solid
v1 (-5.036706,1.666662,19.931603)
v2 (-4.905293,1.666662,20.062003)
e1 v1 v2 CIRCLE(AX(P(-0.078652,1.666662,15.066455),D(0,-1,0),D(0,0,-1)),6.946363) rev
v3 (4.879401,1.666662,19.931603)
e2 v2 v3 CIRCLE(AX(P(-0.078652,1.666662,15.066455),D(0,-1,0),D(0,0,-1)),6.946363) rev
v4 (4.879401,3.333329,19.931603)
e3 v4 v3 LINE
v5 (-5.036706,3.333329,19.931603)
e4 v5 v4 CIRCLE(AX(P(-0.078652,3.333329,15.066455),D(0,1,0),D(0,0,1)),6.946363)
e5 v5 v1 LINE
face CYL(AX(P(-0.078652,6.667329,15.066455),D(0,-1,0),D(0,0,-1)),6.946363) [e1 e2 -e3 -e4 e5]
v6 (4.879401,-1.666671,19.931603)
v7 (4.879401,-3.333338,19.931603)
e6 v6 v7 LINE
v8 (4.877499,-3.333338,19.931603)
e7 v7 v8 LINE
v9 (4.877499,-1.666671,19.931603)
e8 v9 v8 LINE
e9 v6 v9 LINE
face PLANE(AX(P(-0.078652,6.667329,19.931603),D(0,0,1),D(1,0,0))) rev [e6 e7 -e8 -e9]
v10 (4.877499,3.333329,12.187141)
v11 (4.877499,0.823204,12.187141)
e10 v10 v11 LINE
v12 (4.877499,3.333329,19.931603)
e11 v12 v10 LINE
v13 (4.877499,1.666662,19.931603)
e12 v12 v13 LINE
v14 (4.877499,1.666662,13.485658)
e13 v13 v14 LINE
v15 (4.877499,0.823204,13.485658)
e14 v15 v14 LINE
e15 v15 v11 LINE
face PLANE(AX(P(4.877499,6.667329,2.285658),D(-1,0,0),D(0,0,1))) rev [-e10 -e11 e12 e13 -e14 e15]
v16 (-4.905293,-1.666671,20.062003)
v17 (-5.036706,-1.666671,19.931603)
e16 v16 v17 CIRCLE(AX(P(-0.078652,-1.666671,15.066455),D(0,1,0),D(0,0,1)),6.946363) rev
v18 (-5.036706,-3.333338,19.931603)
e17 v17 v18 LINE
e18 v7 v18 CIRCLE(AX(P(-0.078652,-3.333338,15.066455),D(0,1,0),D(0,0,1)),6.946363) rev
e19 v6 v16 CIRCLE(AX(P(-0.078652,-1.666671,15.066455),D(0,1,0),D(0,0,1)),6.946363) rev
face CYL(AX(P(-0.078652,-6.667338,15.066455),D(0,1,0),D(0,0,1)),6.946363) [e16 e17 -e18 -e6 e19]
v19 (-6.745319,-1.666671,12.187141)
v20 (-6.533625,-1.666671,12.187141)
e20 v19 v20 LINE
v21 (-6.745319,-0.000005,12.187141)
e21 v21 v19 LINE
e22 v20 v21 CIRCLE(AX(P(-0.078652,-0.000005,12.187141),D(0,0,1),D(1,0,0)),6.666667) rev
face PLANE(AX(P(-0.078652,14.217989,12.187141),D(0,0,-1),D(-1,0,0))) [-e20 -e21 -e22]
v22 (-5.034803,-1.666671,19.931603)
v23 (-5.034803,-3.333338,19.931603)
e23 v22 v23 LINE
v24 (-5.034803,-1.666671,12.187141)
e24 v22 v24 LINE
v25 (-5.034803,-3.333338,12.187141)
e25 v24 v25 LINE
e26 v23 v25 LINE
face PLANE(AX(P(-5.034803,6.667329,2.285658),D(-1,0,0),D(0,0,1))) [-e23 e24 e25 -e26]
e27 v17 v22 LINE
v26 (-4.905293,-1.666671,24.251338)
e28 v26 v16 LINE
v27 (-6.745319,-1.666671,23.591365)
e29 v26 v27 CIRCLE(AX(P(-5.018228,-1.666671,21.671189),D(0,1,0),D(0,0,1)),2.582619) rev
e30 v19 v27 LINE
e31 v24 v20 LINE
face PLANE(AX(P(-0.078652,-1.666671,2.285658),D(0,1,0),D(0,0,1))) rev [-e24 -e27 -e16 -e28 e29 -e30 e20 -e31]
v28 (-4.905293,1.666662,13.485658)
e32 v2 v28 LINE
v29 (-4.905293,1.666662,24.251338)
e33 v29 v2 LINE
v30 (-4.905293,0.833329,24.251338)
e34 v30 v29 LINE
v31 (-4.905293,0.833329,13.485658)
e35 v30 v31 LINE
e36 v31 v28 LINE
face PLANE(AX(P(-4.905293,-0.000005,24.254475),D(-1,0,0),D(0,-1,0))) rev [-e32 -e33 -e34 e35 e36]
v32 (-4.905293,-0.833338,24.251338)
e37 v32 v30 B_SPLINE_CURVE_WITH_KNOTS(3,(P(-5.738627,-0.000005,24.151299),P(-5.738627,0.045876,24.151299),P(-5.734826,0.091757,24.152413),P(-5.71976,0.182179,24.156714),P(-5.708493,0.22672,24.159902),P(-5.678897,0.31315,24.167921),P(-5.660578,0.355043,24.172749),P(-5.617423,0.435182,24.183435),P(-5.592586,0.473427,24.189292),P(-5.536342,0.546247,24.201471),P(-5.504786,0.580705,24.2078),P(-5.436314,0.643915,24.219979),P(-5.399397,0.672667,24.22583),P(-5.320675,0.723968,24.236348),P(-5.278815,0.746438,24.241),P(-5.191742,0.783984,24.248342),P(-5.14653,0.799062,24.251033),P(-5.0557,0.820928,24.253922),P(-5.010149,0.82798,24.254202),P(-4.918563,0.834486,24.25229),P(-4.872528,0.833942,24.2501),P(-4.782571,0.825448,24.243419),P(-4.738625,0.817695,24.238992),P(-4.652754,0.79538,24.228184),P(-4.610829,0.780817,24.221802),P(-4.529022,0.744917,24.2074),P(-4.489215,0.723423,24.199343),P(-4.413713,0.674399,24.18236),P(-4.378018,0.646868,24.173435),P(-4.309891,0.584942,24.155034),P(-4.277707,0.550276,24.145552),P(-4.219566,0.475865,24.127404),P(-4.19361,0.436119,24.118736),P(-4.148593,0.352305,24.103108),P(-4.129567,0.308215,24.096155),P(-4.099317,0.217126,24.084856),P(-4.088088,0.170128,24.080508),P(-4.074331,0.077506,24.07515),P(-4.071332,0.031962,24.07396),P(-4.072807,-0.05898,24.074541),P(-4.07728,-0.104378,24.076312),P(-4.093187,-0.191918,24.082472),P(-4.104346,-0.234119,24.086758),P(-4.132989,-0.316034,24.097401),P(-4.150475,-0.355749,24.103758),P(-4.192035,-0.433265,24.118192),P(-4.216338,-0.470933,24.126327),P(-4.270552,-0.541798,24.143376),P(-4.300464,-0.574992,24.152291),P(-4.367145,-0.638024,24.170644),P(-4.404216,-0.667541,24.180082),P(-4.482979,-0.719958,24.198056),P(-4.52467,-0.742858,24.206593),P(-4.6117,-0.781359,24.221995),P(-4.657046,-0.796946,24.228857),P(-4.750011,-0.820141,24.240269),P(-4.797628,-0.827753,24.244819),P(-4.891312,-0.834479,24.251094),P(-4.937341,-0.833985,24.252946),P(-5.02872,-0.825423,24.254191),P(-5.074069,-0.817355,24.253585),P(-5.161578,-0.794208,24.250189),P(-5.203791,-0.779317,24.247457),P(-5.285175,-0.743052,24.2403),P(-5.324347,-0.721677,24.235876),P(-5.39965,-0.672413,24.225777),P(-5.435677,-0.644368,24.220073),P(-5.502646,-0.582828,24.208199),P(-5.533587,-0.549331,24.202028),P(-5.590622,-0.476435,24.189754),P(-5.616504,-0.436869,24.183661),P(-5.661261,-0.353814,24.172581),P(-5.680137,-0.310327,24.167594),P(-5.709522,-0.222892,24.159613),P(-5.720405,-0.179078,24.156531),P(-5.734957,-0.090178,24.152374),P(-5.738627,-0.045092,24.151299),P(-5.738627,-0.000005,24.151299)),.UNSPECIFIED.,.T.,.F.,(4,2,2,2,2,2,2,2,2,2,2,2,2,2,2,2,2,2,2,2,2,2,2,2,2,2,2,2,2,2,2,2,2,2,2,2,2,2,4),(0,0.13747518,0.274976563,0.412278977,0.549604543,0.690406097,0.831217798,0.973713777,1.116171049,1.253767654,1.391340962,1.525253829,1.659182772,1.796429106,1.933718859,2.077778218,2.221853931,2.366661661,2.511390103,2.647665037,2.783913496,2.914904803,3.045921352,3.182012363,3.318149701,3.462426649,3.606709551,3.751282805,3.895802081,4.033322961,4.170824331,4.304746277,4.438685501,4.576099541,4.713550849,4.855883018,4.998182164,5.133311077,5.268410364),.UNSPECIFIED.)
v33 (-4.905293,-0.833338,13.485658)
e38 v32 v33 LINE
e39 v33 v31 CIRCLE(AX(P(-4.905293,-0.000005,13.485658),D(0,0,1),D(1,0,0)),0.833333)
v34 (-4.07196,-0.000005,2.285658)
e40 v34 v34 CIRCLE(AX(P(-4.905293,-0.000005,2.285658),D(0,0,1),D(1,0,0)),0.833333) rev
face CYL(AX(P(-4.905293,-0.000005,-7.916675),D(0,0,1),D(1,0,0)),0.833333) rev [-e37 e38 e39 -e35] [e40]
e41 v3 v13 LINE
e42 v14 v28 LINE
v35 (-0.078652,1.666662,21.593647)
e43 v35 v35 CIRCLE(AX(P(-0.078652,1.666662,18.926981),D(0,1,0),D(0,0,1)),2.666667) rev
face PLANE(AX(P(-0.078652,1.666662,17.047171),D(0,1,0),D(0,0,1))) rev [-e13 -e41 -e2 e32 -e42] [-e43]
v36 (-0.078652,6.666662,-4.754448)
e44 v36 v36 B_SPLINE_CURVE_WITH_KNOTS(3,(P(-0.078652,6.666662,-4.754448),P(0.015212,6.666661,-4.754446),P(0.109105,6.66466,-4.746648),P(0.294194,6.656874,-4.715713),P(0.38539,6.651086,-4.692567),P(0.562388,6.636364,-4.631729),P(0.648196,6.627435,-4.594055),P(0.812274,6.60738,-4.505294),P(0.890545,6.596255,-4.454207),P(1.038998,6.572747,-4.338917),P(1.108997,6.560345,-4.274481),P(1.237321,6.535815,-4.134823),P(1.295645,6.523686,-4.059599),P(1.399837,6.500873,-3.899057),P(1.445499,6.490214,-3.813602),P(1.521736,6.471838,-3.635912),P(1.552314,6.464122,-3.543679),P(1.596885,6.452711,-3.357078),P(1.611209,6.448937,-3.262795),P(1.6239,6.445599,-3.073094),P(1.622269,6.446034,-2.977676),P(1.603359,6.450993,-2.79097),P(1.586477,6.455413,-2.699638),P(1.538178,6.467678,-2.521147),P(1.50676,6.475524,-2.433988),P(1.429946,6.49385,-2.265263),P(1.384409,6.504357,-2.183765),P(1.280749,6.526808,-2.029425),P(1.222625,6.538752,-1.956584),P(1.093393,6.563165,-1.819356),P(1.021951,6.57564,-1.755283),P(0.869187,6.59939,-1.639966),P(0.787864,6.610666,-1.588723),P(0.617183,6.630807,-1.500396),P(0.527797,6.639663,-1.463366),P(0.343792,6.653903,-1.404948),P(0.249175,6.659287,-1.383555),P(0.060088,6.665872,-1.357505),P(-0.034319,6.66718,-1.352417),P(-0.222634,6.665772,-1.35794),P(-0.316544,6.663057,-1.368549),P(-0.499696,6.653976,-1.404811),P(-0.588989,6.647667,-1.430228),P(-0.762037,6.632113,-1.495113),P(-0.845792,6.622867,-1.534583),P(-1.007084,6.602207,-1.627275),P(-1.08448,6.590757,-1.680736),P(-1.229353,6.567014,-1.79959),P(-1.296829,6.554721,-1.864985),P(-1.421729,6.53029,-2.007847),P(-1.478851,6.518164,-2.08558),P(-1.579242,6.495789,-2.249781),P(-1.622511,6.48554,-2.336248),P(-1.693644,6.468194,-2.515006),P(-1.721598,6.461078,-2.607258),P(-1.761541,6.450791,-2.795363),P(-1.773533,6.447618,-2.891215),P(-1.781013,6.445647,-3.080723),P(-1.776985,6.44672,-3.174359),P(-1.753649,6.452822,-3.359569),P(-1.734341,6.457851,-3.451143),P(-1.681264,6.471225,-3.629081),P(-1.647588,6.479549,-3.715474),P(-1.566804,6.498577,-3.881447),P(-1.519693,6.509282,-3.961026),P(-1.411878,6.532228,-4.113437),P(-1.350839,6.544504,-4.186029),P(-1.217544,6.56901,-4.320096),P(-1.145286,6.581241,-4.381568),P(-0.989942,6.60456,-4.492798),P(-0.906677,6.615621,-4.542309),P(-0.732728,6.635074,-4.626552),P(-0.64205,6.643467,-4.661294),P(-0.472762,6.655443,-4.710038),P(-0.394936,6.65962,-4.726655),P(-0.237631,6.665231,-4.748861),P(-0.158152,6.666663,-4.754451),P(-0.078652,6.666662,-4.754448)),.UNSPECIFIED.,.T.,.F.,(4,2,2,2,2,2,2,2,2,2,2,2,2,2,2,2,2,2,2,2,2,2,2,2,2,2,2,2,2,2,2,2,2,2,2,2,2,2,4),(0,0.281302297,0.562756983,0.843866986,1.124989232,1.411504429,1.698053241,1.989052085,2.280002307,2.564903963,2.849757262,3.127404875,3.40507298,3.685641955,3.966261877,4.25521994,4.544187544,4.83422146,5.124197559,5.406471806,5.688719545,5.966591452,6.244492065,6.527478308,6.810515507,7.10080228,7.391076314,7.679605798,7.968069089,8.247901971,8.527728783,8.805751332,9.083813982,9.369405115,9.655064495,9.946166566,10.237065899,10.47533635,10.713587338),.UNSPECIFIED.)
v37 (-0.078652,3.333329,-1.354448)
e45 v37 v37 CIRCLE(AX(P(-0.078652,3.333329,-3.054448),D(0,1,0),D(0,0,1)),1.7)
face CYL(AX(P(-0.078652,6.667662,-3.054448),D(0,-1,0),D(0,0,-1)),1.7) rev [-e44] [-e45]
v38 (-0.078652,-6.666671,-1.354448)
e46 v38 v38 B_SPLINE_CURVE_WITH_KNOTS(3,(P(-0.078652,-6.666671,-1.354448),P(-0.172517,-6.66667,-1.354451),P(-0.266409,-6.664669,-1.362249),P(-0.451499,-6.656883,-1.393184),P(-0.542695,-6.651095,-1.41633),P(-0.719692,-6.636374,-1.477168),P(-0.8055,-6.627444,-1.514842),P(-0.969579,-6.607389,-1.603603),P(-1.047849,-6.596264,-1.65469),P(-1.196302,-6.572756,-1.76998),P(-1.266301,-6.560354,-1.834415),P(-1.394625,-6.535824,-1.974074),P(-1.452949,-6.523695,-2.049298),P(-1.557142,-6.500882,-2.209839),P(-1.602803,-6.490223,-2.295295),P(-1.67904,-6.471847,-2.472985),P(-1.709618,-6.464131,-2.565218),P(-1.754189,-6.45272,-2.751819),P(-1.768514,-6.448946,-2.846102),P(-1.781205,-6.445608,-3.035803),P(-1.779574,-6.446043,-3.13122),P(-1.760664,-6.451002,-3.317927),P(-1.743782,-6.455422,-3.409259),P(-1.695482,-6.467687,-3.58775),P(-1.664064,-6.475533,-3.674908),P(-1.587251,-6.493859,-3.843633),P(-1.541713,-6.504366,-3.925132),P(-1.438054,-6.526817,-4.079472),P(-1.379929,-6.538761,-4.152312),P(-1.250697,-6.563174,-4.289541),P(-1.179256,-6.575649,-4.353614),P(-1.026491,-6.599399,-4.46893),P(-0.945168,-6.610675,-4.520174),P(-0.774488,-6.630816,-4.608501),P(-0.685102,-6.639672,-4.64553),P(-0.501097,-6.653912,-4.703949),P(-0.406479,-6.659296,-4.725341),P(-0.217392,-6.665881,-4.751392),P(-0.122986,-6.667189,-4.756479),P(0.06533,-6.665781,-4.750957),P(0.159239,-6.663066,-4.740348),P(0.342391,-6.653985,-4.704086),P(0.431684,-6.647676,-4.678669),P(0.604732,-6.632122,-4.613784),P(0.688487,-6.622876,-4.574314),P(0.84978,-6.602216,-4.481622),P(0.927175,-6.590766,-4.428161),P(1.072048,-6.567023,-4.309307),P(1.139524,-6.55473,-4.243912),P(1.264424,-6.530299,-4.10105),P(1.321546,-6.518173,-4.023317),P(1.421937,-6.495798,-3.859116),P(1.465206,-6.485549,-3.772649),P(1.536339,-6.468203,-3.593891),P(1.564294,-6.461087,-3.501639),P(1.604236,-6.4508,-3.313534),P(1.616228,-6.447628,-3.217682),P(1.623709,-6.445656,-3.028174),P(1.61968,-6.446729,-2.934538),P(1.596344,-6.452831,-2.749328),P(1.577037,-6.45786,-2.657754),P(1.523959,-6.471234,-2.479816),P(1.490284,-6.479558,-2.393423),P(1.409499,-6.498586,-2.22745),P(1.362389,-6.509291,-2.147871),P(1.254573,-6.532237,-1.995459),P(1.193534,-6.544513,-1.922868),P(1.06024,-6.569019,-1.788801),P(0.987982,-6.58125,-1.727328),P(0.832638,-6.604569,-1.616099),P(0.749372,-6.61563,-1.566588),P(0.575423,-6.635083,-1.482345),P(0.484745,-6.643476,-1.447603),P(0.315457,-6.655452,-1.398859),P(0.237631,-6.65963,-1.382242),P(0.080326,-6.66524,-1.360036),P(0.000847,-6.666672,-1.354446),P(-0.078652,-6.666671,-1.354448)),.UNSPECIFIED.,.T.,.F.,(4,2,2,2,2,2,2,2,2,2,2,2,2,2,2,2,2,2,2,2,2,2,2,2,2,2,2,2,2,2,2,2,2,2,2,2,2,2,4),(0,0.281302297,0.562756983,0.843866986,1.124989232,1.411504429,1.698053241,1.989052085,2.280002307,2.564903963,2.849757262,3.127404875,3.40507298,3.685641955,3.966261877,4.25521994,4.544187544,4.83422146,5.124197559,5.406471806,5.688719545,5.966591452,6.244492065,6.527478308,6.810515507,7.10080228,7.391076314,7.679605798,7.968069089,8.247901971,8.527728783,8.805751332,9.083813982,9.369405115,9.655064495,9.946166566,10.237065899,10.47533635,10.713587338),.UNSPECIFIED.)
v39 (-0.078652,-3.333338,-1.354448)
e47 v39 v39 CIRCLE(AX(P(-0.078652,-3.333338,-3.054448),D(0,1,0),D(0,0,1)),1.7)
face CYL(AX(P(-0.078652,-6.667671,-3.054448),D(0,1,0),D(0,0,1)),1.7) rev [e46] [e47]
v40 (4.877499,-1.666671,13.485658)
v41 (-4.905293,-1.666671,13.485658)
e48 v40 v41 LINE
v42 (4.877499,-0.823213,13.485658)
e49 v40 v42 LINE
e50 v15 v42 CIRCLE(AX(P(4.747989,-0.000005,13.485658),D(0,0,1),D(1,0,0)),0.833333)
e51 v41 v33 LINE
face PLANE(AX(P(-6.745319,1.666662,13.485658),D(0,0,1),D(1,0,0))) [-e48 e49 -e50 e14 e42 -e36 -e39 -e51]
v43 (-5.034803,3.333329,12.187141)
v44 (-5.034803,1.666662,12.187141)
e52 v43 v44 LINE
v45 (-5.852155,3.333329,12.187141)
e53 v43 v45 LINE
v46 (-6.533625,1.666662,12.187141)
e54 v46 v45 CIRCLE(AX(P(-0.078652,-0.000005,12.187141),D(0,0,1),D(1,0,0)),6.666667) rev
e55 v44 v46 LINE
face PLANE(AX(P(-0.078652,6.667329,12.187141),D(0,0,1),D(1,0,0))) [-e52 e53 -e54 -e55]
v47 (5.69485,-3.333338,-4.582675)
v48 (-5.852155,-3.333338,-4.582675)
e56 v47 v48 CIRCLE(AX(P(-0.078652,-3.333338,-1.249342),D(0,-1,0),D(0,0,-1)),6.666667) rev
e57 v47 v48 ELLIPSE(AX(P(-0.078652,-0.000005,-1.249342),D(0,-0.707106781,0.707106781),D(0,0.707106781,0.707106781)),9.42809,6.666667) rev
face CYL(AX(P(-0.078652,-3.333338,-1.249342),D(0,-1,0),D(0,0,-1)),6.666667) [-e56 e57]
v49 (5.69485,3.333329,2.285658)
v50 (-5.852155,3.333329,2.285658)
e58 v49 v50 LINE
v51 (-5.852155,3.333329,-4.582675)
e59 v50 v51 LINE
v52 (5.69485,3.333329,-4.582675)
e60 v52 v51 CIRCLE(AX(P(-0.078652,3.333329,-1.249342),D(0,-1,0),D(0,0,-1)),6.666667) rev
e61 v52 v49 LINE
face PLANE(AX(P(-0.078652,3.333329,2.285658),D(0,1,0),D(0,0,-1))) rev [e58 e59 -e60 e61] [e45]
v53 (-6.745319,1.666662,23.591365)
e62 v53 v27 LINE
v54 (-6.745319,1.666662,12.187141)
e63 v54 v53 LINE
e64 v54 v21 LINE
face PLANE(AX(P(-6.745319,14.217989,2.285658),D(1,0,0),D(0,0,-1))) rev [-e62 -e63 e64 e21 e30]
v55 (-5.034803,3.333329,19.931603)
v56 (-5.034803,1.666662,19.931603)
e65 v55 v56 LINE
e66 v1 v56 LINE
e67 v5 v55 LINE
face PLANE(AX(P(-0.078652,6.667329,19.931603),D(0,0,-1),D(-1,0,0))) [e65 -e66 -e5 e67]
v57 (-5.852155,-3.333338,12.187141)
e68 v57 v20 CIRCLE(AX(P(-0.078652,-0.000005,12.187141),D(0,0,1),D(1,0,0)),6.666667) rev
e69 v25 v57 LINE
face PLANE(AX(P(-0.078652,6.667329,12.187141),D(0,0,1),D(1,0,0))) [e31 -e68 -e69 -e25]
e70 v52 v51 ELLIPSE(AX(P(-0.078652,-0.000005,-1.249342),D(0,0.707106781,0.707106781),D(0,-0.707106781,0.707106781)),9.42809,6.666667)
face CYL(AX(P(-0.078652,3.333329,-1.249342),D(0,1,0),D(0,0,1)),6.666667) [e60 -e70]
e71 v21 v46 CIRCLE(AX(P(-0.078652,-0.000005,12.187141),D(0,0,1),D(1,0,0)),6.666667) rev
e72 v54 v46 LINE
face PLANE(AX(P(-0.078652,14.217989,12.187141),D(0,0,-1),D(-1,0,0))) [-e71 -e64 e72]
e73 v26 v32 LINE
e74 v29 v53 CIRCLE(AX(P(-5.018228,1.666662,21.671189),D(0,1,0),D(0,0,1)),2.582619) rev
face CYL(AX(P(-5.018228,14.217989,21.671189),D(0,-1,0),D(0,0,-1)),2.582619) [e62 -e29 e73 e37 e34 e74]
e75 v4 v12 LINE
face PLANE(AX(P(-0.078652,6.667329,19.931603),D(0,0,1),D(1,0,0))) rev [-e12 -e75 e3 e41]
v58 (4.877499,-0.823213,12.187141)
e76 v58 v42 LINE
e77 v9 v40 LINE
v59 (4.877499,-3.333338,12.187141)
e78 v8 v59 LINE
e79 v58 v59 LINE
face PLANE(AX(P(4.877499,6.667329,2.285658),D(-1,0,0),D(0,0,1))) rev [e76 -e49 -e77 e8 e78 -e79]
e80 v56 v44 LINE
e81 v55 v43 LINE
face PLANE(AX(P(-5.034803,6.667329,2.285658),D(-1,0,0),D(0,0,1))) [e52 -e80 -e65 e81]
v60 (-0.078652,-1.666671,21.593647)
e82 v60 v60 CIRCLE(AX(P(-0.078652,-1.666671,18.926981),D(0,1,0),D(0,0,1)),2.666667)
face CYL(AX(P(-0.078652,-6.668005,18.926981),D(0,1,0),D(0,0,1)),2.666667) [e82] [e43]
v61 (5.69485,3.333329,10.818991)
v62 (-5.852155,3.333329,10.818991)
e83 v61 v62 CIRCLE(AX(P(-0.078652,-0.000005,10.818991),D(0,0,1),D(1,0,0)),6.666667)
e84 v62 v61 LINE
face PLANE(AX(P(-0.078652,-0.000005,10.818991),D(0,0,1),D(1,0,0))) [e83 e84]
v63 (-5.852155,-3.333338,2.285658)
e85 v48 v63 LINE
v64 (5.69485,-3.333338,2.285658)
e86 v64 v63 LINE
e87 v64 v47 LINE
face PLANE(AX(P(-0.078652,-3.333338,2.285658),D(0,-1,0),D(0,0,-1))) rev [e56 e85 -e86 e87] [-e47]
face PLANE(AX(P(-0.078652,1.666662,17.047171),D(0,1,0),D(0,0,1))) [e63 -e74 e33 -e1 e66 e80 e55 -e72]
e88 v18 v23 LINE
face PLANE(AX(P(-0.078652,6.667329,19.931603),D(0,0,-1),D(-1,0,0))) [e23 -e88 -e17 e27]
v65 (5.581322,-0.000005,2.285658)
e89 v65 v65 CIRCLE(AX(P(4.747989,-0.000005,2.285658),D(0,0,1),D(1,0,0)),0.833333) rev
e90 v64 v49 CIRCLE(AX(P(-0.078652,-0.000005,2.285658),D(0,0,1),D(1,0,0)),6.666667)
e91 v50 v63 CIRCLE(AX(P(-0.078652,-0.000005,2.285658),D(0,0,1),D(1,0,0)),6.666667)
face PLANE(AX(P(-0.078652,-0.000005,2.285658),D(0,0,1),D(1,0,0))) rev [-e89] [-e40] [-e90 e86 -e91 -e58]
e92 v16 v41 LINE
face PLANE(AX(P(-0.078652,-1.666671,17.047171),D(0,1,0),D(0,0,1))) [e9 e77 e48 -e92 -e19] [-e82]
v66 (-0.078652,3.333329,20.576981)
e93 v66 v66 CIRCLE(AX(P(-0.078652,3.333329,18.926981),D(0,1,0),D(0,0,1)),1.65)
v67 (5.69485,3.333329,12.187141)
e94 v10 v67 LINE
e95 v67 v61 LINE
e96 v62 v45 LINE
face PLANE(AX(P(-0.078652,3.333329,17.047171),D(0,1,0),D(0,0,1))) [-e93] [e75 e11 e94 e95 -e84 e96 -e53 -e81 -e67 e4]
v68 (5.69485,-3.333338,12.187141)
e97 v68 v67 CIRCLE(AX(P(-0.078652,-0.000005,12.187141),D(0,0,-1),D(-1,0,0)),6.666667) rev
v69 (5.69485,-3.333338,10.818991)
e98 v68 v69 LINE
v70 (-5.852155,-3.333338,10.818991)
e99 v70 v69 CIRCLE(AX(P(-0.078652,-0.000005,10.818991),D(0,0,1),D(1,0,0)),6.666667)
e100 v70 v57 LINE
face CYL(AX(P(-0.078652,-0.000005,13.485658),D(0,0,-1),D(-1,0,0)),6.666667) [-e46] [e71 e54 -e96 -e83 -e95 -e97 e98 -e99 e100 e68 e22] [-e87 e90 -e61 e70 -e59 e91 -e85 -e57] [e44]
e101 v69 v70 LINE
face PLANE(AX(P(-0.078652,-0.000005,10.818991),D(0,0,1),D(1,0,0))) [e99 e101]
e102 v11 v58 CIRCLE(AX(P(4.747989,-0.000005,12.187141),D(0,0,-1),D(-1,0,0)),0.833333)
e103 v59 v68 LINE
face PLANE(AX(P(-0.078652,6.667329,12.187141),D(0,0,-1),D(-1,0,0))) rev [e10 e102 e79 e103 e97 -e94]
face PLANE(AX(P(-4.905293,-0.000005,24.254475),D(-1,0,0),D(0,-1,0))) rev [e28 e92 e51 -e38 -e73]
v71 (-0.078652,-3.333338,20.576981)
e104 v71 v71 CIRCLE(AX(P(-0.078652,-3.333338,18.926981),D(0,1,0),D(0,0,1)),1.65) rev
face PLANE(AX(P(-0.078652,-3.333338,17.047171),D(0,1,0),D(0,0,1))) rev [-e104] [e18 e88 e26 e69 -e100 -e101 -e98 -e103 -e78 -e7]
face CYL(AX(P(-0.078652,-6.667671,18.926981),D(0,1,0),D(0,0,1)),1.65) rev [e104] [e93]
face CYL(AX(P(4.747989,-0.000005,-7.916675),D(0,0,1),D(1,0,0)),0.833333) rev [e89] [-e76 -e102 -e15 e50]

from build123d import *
from build123d.topology import SkipClean

# Parameters (mm, degrees)
SKETCH2_R                       = 10
PHALANGE_LENGTH_DEPTH           = 16.8
BOSS_EXTRUDE3_DEPTH             = 5
BOSS_EXTRUDE4_DEPTH             = 5
BOSS_EXTRUDE4_DEPTH_BACK        = 5
CUT_EXTRUDE2_START              = -15.3025
CUT_EXTRUDE2_DEPTH              = 15.3025
SKETCH7_R                       = 1.65
CUT_EXTRUDE3_DEPTH              = 10
CUT_EXTRUDE4_DEPTH              = 2.5
CUT_EXTRUDE4_DEPTH_BACK         = 2.5
CUT_EXTRUDE7_REACH              = 38.861
SKETCH4_R                       = 1.65
CUT_EXTRUDE7_DIRECTION_2_REACH  = 38.861
CUT_EXTRUDE_THIN1_START         = 16.8
CUT_EXTRUDE_THIN1_DEPTH         = 10.361670454
BOSS_EXTRUDE5_REACH             = 37.917
SKETCH9_R                       = 4
SKETCH9_R_2                     = 1.65
CUT_EXTRUDE8_REACH              = 37.079
SKETCH10_R                      = 1.25
CUT_EXTRUDE9_START              = -4
CUT_EXTRUDE9_DEPTH              = 4
CUT_EXTRUDE10_REACH             = 37.917
CUT_EXTRUDE10_DIRECTION_2_REACH = 37.917
CUT_EXTRUDE11_START             = -10
CUT_EXTRUDE11_OUTLINE_W         = 2.565773848
CUT_EXTRUDE11_OUTLINE_H         = 11.6166929
CUT_EXTRUDE11_DEPTH             = 10
BOSS_EXTRUDE7_REACH             = 35.643
CUT_EXTRUDE12_REACH             = 37.079
SKETCH10_2_R                    = 1.25
CUT_EXTRUDE12_DIRECTION_2_REACH = 37.079
SKETCH17_R                      = 1.25
SKETCH17_W                      = 2.42123439
SKETCH17_H                      = 5
CUT_EXTRUDE14_DEPTH             = 16.148519
SCALE1_SCALE                    = 0.666666667
CUT_EXTRUDE15_START             = -10
SKETCH18_R                      = 1.65
CUT_EXTRUDE15_DEPTH             = 13.333338
CUT_EXTRUDE16_START             = -3.333333
SKETCH19_R                      = 1.7
CUT_EXTRUDE16_DEPTH             = 13.333338


# Read off the part's stored shape, not the designer's step: Cut-Extrude-Thin1, Cut-Extrude11
with BuildPart() as part:
    # Sketch2 → Phalange Length (new body)
    with BuildSketch(Plane.XY):
        Circle(SKETCH2_R)
    extrude(amount=PHALANGE_LENGTH_DEPTH)

    # Sketch3 → Boss-Extrude3 (add)
    with BuildSketch(Plane(origin=(0, -10, 0), x_dir=(-1, 0, 0), z_dir=(0, -1, 0))):
        with BuildLine():
            Line((-10, 5.302499701), (-10, 0))
            Line((-10, 0), (10, 0))
            Line((10, 0), (10, 5.302499701))
            ThreePointArc((10, 5.302499701), (0, 15.302499701), (-10, 5.302499701))
        make_face()
    boss_extrude3 = extrude(amount=-BOSS_EXTRUDE3_DEPTH)

    # Mirror1: Boss-Extrude3 across plane
    add(boss_extrude3.mirror(Plane.ZX))

    # Sketch5 → Boss-Extrude4 (add, two sides: drawn at the far end of the back side and taken through both)
    with BuildSketch(Plane(origin=(0, 0, 0), x_dir=(1, 0, 0), z_dir=(0, 1, 0)).offset(-BOSS_EXTRUDE4_DEPTH_BACK)):
        with BuildLine():
            Line((-10, -22.583157911), (-10, -16.8))
            Line((-10, -16.8), (10, -16.8))
            Line((10, -16.8), (10, -22.583157911))
            ThreePointArc((10, -22.583157911), (0, -32.151984156), (-10, -22.583157911))
        make_face()
    extrude(amount=BOSS_EXTRUDE4_DEPTH + BOSS_EXTRUDE4_DEPTH_BACK)

    # Sketch6 → Cut-Extrude2 (cut)
    with SkipClean():  # the faces are left unmerged after this step: merging them gives an invalid solid
        with BuildSketch(Plane.XY.offset(CUT_EXTRUDE2_START)):
            with BuildLine():
                ThreePointArc((0, 10), (5, 8.660254038), (8.660254038, 5))
                Line((8.660254038, 5), (10, 5))
                Line((10, 5), (10, 10))
                Line((10, 10), (0, 10))
            make_face()
            with BuildLine():
                Line((10, -5), (8.660254038, -5))
                ThreePointArc((8.660254038, -5), (5, -8.660254038), (0, -10))
                Line((0, -10), (10, -10))
                Line((10, -10), (10, -5))
            make_face()
            with BuildLine():
                ThreePointArc((-8.660254038, 5), (-5, 8.660254038), (0, 10))
                Line((0, 10), (-10, 10))
                Line((-10, 10), (-10, 5))
                Line((-10, 5), (-8.660254038, 5))
            make_face()
            with BuildLine():
                Line((-10, -10), (0, -10))
                ThreePointArc((0, -10), (-5, -8.660254038), (-8.660254038, -5))
                Line((-8.660254038, -5), (-10, -5))
                Line((-10, -5), (-10, -10))
            make_face()
        extrude(amount=CUT_EXTRUDE2_DEPTH, mode=Mode.SUBTRACT)

    # Sketch7 → Cut-Extrude3 (cut)
    with SkipClean():  # the faces are left unmerged after this step: merging them gives an invalid solid
        with BuildSketch(Plane(origin=(0, 5, 0), x_dir=(1, 0, 0), z_dir=(0, 1, 0))):
            with Locations(Location((0, -24.961984156, 0), (0, 0, 270))):
                Circle(SKETCH7_R)
        extrude(amount=-CUT_EXTRUDE3_DEPTH, mode=Mode.SUBTRACT)

    # Sketch5<2> → Cut-Extrude4 (cut, two sides: drawn at the far end of the back side and taken through both)
    with BuildSketch(Plane(origin=(0, 0, 0), x_dir=(1, 0, 0), z_dir=(0, 1, 0)).offset(-CUT_EXTRUDE4_DEPTH_BACK)):
        with BuildLine():
            Line((-10, -22.583157911), (-10, -16.8))
            Line((-10, -16.8), (10, -16.8))
            Line((10, -16.8), (10, -22.583157911))
            ThreePointArc((10, -22.583157911), (0, -32.151984156), (-10, -22.583157911))
        make_face()
    extrude(amount=CUT_EXTRUDE4_DEPTH + CUT_EXTRUDE4_DEPTH_BACK, mode=Mode.SUBTRACT)

    # Sketch4 → Cut-Extrude7 (cut, up to next)
    with BuildSketch(Plane(origin=(0, -5, 0), x_dir=(1, 0, 0), z_dir=(0, 1, 0)), mode=Mode.PRIVATE) as cut_extrude7_sk1:
        with Locations(Location((0, 8.010159673, 0), (0, 0, 270))):
            Circle(SKETCH4_R)
    cut_extrude7_tool1 = extrude(cut_extrude7_sk1.sketch, amount=-CUT_EXTRUDE7_REACH, mode=Mode.PRIVATE) & part.part
    add(cut_extrude7_tool1.solids().sort_by_distance((0, -5, -8.01016))[0], mode=Mode.SUBTRACT)

    # Sketch4 → Cut-Extrude7 direction 2 (cut, up to next)
    with BuildSketch(Plane(origin=(0, -5, 0), x_dir=(1, 0, 0), z_dir=(0, 1, 0)), mode=Mode.PRIVATE) as cut_extrude7_direction_2_sk1:
        with Locations(Location((0, 8.010159673, 0), (0, 0, 270))):
            Circle(SKETCH4_R)
    cut_extrude7_direction_2_tool1 = extrude(cut_extrude7_direction_2_sk1.sketch, amount=CUT_EXTRUDE7_DIRECTION_2_REACH, mode=Mode.PRIVATE) & part.part
    add(cut_extrude7_direction_2_tool1.solids().sort_by_distance((0, -5, -8.01016))[0], mode=Mode.SUBTRACT)

    # Cut-Extrude-Thin1 outline → Cut-Extrude-Thin1 (cut)
    with SkipClean():  # the faces are left unmerged after this step: merging them gives an invalid solid
        with BuildSketch(Plane.XY.offset(CUT_EXTRUDE_THIN1_START)):
            with BuildLine():
                ThreePointArc((8.660254038, 5), (9.256147934, 3.78466979), (9.682458366, 2.5))
                Line((9.682458366, 2.5), (10, 2.5))
                Line((10, 2.5), (10, 5))
                Line((10, 5), (8.660254038, 5))
            make_face()
            with BuildLine():
                Line((10, -2.5), (9.682458366, -2.5))
                ThreePointArc((9.682458366, -2.5), (9.256147934, -3.78466979), (8.660254038, -5))
                Line((8.660254038, -5), (10, -5))
                Line((10, -5), (10, -2.5))
            make_face()
            with BuildLine():
                Line((-10, 2.5), (-9.682458366, 2.5))
                ThreePointArc((-9.682458366, 2.5), (-9.256147934, 3.78466979), (-8.660254038, 5))
                Line((-8.660254038, 5), (-10, 5))
                Line((-10, 5), (-10, 2.5))
            make_face()
            with BuildLine():
                ThreePointArc((-8.660254038, -5), (-9.256147934, -3.78466979), (-9.682458366, -2.5))
                Line((-9.682458366, -2.5), (-10, -2.5))
                Line((-10, -2.5), (-10, -5))
                Line((-10, -5), (-8.660254038, -5))
            make_face()
        extrude(amount=CUT_EXTRUDE_THIN1_DEPTH, mode=Mode.SUBTRACT)

    # Sketch9 → Boss-Extrude5 (add, up to next)
    with BuildSketch(Plane.XZ.offset(-2.5), mode=Mode.PRIVATE) as boss_extrude5_sk1:
        with Locations(Location((0, 24.961984156, 0), (0, 0, 90))):
            Circle(SKETCH9_R)
        with Locations(Location((0, 24.961984156, 0), (0, 0, 90))):
            Circle(SKETCH9_R_2, mode=Mode.SUBTRACT)
    boss_extrude5_tool1 = extrude(boss_extrude5_sk1.sketch, amount=BOSS_EXTRUDE5_REACH, mode=Mode.PRIVATE) - part.part
    add(boss_extrude5_tool1.solids().sort_by_distance((0, 2.5, 21.075121))[0])

    # Sketch10 → Cut-Extrude8 (cut, up to next)
    with BuildSketch(Plane.XY.offset(16.8), mode=Mode.PRIVATE) as cut_extrude8_sk1:
        with Locations((7.239961745, 0)):
            Circle(SKETCH10_R)
    cut_extrude8_tool1 = extrude(cut_extrude8_sk1.sketch, amount=-CUT_EXTRUDE8_REACH, mode=Mode.PRIVATE) & part.part
    # Sketch10 → Cut-Extrude8 (cut, up to next)
    with BuildSketch(Plane.XY.offset(16.8), mode=Mode.PRIVATE) as cut_extrude8_sk2:
        with Locations((-7.239961745, 0)):
            Circle(SKETCH10_R)
    cut_extrude8_tool2 = extrude(cut_extrude8_sk2.sketch, amount=-CUT_EXTRUDE8_REACH, mode=Mode.PRIVATE) & part.part
    add(cut_extrude8_tool1.solids().sort_by_distance((7.239962, 0, 16.8))[0], mode=Mode.SUBTRACT)
    add(cut_extrude8_tool2.solids().sort_by_distance((-7.239962, 0, 16.8))[0], mode=Mode.SUBTRACT)

    # Sketch11 → Cut-Extrude9 (cut)
    with SkipClean():  # the faces are left unmerged after this step: merging them gives an invalid solid
        with BuildSketch(Plane.XY.offset(16.8).offset(CUT_EXTRUDE9_START)):
            with BuildLine():
                ThreePointArc((8.660254038, 5), (0, 10), (-8.660254038, 5))
                Line((-8.660254038, 5), (8.660254038, 5))
            make_face()
            with BuildLine():
                Line((8.660254038, -5), (-8.660254038, -5))
                ThreePointArc((-8.660254038, -5), (0, -10), (8.660254038, -5))
            make_face()
        extrude(amount=CUT_EXTRUDE9_DEPTH, mode=Mode.SUBTRACT)

    # Sketch12 → Cut-Extrude10 (cut, up to next)
    with BuildSketch(Plane.XZ.offset(-2.5), mode=Mode.PRIVATE) as cut_extrude10_sk1:
        with BuildLine():
            Line((-10.033719202, 32.151984156), (-10.033719202, 24.964892021))
            Line((-10.033719202, 24.964892021), (-8.660254038, 24.964892021))
            ThreePointArc((-8.660254038, 24.964892021), (0, 29.590740593), (8.660254038, 24.964892021))
            Line((8.660254038, 24.964892021), (10.033719202, 24.964892021))
            Line((10.033719202, 24.964892021), (10.033719202, 32.151984156))
            Line((10.033719202, 32.151984156), (-10.033719202, 32.151984156))
        make_face()
    cut_extrude10_tool1 = extrude(cut_extrude10_sk1.sketch, amount=CUT_EXTRUDE10_REACH, mode=Mode.PRIVATE) & part.part
    add(cut_extrude10_tool1.solids().sort_by_distance((0, 2.5, 29.650279))[0], mode=Mode.SUBTRACT)

    # Sketch12 → Cut-Extrude10 direction 2 (cut, up to next)
    with BuildSketch(Plane.XZ.offset(-2.5), mode=Mode.PRIVATE) as cut_extrude10_direction_2_sk1:
        with BuildLine():
            Line((-10.033719202, 32.151984156), (-10.033719202, 24.964892021))
            Line((-10.033719202, 24.964892021), (-8.660254038, 24.964892021))
            ThreePointArc((-8.660254038, 24.964892021), (0, 29.590740593), (8.660254038, 24.964892021))
            Line((8.660254038, 24.964892021), (10.033719202, 24.964892021))
            Line((10.033719202, 24.964892021), (10.033719202, 32.151984156))
            Line((10.033719202, 32.151984156), (-10.033719202, 32.151984156))
        make_face()
    cut_extrude10_direction_2_tool1 = extrude(cut_extrude10_direction_2_sk1.sketch, amount=-CUT_EXTRUDE10_DIRECTION_2_REACH, mode=Mode.PRIVATE) & part.part
    add(cut_extrude10_direction_2_tool1.solids().sort_by_distance((0, 2.5, 29.650279))[0], mode=Mode.SUBTRACT)

    # Cut-Extrude11 outline → Cut-Extrude11 (cut)
    with BuildSketch(Plane.XZ.offset(5).offset(CUT_EXTRUDE11_START)):
        with Locations((-8.717113076, 20.660571369)):
            Rectangle(CUT_EXTRUDE11_OUTLINE_W, CUT_EXTRUDE11_OUTLINE_H)
        with Locations((8.717113076, 20.660571369)):
            Rectangle(CUT_EXTRUDE11_OUTLINE_W, CUT_EXTRUDE11_OUTLINE_H)
    extrude(amount=CUT_EXTRUDE11_DEPTH, mode=Mode.SUBTRACT)

    # Boss-Extrude7: up to this face of the body (flat: up to its plane)
    boss_extrude7_end = Plane(part.part.faces().sort_by_distance((0, 2.5, 16.996174341))[0])
    # Sketch16 → Boss-Extrude7 (add, up to the picked face)
    with BuildSketch(Plane(origin=(0, -2.5, 0), x_dir=(1, 0, 0), z_dir=(0, 1, 0)), mode=Mode.PRIVATE) as boss_extrude7_sk1:
        with BuildLine():
            Line((-4.818727355, -14.852224919), (-7.434226152, -14.852224919))
            Line((-7.434226152, -14.852224919), (-10, -14.852224919))
            Line((-10, -14.852224919), (-10, -31.958561033))
            ThreePointArc((-10, -31.958561033), (-8.808295471, -32.690817912), (-7.43422564, -32.952145139))
            ThreePointArc((-7.43422564, -32.952145139), (-6.033645007, -32.699721533), (-4.818727355, -31.958561033))
            Line((-4.818727355, -31.958561033), (-4.818727355, -28.409527951))
            ThreePointArc((-4.818727355, -28.409527951), (-6.204248493, -27.542230104), (-7.437080645, -26.468917819))
            Line((-7.437080645, -26.468917819), (-7.434226152, -26.468917819))
            Line((-7.434226152, -26.468917819), (-7.434226152, -16.8))
            Line((-7.434226152, -16.8), (-4.818727355, -16.8))
            Line((-4.818727355, -16.8), (-4.818727355, -14.852224919))
        make_face()
    boss_extrude7_tool1 = split(extrude(boss_extrude7_sk1.sketch, amount=BOSS_EXTRUDE7_REACH, mode=Mode.PRIVATE), bisect_by=boss_extrude7_end, keep=Keep.BOTH, mode=Mode.PRIVATE)
    # Sketch16 → Boss-Extrude7 (add, up to the picked face)
    with BuildSketch(Plane(origin=(0, -2.5, 0), x_dir=(1, 0, 0), z_dir=(0, 1, 0)), mode=Mode.PRIVATE) as boss_extrude7_sk2:
        with BuildLine():
            Line((-4.818727355, -28.409527951), (-4.818727355, -16.8))
            Line((-4.818727355, -16.8), (-7.434226152, -16.8))
            Line((-7.434226152, -16.8), (-7.434226152, -26.468917819))
            Line((-7.434226152, -26.468917819), (-7.437080645, -26.468917819))
            ThreePointArc((-7.437080645, -26.468917819), (-6.204248493, -27.542230104), (-4.818727355, -28.409527951))
        make_face()
    boss_extrude7_tool2 = split(extrude(boss_extrude7_sk2.sketch, amount=BOSS_EXTRUDE7_REACH, mode=Mode.PRIVATE), bisect_by=boss_extrude7_end, keep=Keep.BOTH, mode=Mode.PRIVATE)
    add(boss_extrude7_tool1.solids().sort_by(Axis((-7.989429, -2.5, 24.433344), (0, 1, 0)))[0])
    add(boss_extrude7_tool2.solids().sort_by(Axis((-6.08748, -2.5, 22.1879), (0, 1, 0)))[0])

    # Sketch10<2> → Cut-Extrude12 (cut, up to next)
    with BuildSketch(Plane.XY.offset(16.8), mode=Mode.PRIVATE) as cut_extrude12_sk1:
        with Locations((-7.239961745, 0)):
            Circle(SKETCH10_2_R)
    cut_extrude12_tool1 = extrude(cut_extrude12_sk1.sketch, amount=CUT_EXTRUDE12_REACH, mode=Mode.PRIVATE) & part.part
    add(cut_extrude12_tool1.solids().sort_by_distance((-7.239962, 0, 16.8))[0], mode=Mode.SUBTRACT)

    # Sketch10<2> → Cut-Extrude12 direction 2 (cut, up to next)
    with BuildSketch(Plane.XY.offset(16.8), mode=Mode.PRIVATE) as cut_extrude12_direction_2_sk1:
        with Locations((-7.239961745, 0)):
            Circle(SKETCH10_2_R)
    cut_extrude12_direction_2_tool1 = extrude(cut_extrude12_direction_2_sk1.sketch, amount=-CUT_EXTRUDE12_DIRECTION_2_REACH, mode=Mode.PRIVATE) & part.part
    add(cut_extrude12_direction_2_tool1.solids().sort_by_distance((-7.239962, 0, 16.8))[0], mode=Mode.SUBTRACT)

    # Sketch17 → Cut-Extrude14 (cut)
    with SkipClean():  # the faces are left unmerged after this step: merging them gives an invalid solid
        with BuildSketch(Plane.XY.offset(16.8)):
            with Locations((-7.239961745, 0)):
                Circle(SKETCH17_R)
            with Locations((-6.02934455, 0)):
                Rectangle(SKETCH17_W, SKETCH17_H)
        extrude(amount=CUT_EXTRUDE14_DEPTH, mode=Mode.SUBTRACT)


with BuildPart() as part_1:
    # Scale1: scaled about (-0.235925665, -2.1e-07, 6.856472765)
    add(part.part.scale(SCALE1_SCALE).moved(Location((-0.078641888, -7e-08, 2.285490922))))

    # Sketch18 → Cut-Extrude15 (cut)
    with BuildSketch(Plane(origin=(0, 3.333328812, 0), x_dir=(1, 0, 0), z_dir=(0, 1, 0)).offset(CUT_EXTRUDE15_START)):
        with Locations(Location((-0.078652268, -18.926980833, 0), (0, 0, 270))):
            Circle(SKETCH18_R)
    extrude(amount=CUT_EXTRUDE15_DEPTH, mode=Mode.SUBTRACT)

    # Sketch19 → Cut-Extrude16 (cut)
    with BuildSketch(Plane(origin=(0, -3.333337854, 0), x_dir=(1, 0, 0), z_dir=(0, 1, 0)).offset(CUT_EXTRUDE16_START)):
        with Locations(Location((-0.078652268, 3.054448386, 0), (0, 0, 90))):
            Circle(SKETCH19_R)
    extrude(amount=CUT_EXTRUDE16_DEPTH, mode=Mode.SUBTRACT)


solid = part_1.part
